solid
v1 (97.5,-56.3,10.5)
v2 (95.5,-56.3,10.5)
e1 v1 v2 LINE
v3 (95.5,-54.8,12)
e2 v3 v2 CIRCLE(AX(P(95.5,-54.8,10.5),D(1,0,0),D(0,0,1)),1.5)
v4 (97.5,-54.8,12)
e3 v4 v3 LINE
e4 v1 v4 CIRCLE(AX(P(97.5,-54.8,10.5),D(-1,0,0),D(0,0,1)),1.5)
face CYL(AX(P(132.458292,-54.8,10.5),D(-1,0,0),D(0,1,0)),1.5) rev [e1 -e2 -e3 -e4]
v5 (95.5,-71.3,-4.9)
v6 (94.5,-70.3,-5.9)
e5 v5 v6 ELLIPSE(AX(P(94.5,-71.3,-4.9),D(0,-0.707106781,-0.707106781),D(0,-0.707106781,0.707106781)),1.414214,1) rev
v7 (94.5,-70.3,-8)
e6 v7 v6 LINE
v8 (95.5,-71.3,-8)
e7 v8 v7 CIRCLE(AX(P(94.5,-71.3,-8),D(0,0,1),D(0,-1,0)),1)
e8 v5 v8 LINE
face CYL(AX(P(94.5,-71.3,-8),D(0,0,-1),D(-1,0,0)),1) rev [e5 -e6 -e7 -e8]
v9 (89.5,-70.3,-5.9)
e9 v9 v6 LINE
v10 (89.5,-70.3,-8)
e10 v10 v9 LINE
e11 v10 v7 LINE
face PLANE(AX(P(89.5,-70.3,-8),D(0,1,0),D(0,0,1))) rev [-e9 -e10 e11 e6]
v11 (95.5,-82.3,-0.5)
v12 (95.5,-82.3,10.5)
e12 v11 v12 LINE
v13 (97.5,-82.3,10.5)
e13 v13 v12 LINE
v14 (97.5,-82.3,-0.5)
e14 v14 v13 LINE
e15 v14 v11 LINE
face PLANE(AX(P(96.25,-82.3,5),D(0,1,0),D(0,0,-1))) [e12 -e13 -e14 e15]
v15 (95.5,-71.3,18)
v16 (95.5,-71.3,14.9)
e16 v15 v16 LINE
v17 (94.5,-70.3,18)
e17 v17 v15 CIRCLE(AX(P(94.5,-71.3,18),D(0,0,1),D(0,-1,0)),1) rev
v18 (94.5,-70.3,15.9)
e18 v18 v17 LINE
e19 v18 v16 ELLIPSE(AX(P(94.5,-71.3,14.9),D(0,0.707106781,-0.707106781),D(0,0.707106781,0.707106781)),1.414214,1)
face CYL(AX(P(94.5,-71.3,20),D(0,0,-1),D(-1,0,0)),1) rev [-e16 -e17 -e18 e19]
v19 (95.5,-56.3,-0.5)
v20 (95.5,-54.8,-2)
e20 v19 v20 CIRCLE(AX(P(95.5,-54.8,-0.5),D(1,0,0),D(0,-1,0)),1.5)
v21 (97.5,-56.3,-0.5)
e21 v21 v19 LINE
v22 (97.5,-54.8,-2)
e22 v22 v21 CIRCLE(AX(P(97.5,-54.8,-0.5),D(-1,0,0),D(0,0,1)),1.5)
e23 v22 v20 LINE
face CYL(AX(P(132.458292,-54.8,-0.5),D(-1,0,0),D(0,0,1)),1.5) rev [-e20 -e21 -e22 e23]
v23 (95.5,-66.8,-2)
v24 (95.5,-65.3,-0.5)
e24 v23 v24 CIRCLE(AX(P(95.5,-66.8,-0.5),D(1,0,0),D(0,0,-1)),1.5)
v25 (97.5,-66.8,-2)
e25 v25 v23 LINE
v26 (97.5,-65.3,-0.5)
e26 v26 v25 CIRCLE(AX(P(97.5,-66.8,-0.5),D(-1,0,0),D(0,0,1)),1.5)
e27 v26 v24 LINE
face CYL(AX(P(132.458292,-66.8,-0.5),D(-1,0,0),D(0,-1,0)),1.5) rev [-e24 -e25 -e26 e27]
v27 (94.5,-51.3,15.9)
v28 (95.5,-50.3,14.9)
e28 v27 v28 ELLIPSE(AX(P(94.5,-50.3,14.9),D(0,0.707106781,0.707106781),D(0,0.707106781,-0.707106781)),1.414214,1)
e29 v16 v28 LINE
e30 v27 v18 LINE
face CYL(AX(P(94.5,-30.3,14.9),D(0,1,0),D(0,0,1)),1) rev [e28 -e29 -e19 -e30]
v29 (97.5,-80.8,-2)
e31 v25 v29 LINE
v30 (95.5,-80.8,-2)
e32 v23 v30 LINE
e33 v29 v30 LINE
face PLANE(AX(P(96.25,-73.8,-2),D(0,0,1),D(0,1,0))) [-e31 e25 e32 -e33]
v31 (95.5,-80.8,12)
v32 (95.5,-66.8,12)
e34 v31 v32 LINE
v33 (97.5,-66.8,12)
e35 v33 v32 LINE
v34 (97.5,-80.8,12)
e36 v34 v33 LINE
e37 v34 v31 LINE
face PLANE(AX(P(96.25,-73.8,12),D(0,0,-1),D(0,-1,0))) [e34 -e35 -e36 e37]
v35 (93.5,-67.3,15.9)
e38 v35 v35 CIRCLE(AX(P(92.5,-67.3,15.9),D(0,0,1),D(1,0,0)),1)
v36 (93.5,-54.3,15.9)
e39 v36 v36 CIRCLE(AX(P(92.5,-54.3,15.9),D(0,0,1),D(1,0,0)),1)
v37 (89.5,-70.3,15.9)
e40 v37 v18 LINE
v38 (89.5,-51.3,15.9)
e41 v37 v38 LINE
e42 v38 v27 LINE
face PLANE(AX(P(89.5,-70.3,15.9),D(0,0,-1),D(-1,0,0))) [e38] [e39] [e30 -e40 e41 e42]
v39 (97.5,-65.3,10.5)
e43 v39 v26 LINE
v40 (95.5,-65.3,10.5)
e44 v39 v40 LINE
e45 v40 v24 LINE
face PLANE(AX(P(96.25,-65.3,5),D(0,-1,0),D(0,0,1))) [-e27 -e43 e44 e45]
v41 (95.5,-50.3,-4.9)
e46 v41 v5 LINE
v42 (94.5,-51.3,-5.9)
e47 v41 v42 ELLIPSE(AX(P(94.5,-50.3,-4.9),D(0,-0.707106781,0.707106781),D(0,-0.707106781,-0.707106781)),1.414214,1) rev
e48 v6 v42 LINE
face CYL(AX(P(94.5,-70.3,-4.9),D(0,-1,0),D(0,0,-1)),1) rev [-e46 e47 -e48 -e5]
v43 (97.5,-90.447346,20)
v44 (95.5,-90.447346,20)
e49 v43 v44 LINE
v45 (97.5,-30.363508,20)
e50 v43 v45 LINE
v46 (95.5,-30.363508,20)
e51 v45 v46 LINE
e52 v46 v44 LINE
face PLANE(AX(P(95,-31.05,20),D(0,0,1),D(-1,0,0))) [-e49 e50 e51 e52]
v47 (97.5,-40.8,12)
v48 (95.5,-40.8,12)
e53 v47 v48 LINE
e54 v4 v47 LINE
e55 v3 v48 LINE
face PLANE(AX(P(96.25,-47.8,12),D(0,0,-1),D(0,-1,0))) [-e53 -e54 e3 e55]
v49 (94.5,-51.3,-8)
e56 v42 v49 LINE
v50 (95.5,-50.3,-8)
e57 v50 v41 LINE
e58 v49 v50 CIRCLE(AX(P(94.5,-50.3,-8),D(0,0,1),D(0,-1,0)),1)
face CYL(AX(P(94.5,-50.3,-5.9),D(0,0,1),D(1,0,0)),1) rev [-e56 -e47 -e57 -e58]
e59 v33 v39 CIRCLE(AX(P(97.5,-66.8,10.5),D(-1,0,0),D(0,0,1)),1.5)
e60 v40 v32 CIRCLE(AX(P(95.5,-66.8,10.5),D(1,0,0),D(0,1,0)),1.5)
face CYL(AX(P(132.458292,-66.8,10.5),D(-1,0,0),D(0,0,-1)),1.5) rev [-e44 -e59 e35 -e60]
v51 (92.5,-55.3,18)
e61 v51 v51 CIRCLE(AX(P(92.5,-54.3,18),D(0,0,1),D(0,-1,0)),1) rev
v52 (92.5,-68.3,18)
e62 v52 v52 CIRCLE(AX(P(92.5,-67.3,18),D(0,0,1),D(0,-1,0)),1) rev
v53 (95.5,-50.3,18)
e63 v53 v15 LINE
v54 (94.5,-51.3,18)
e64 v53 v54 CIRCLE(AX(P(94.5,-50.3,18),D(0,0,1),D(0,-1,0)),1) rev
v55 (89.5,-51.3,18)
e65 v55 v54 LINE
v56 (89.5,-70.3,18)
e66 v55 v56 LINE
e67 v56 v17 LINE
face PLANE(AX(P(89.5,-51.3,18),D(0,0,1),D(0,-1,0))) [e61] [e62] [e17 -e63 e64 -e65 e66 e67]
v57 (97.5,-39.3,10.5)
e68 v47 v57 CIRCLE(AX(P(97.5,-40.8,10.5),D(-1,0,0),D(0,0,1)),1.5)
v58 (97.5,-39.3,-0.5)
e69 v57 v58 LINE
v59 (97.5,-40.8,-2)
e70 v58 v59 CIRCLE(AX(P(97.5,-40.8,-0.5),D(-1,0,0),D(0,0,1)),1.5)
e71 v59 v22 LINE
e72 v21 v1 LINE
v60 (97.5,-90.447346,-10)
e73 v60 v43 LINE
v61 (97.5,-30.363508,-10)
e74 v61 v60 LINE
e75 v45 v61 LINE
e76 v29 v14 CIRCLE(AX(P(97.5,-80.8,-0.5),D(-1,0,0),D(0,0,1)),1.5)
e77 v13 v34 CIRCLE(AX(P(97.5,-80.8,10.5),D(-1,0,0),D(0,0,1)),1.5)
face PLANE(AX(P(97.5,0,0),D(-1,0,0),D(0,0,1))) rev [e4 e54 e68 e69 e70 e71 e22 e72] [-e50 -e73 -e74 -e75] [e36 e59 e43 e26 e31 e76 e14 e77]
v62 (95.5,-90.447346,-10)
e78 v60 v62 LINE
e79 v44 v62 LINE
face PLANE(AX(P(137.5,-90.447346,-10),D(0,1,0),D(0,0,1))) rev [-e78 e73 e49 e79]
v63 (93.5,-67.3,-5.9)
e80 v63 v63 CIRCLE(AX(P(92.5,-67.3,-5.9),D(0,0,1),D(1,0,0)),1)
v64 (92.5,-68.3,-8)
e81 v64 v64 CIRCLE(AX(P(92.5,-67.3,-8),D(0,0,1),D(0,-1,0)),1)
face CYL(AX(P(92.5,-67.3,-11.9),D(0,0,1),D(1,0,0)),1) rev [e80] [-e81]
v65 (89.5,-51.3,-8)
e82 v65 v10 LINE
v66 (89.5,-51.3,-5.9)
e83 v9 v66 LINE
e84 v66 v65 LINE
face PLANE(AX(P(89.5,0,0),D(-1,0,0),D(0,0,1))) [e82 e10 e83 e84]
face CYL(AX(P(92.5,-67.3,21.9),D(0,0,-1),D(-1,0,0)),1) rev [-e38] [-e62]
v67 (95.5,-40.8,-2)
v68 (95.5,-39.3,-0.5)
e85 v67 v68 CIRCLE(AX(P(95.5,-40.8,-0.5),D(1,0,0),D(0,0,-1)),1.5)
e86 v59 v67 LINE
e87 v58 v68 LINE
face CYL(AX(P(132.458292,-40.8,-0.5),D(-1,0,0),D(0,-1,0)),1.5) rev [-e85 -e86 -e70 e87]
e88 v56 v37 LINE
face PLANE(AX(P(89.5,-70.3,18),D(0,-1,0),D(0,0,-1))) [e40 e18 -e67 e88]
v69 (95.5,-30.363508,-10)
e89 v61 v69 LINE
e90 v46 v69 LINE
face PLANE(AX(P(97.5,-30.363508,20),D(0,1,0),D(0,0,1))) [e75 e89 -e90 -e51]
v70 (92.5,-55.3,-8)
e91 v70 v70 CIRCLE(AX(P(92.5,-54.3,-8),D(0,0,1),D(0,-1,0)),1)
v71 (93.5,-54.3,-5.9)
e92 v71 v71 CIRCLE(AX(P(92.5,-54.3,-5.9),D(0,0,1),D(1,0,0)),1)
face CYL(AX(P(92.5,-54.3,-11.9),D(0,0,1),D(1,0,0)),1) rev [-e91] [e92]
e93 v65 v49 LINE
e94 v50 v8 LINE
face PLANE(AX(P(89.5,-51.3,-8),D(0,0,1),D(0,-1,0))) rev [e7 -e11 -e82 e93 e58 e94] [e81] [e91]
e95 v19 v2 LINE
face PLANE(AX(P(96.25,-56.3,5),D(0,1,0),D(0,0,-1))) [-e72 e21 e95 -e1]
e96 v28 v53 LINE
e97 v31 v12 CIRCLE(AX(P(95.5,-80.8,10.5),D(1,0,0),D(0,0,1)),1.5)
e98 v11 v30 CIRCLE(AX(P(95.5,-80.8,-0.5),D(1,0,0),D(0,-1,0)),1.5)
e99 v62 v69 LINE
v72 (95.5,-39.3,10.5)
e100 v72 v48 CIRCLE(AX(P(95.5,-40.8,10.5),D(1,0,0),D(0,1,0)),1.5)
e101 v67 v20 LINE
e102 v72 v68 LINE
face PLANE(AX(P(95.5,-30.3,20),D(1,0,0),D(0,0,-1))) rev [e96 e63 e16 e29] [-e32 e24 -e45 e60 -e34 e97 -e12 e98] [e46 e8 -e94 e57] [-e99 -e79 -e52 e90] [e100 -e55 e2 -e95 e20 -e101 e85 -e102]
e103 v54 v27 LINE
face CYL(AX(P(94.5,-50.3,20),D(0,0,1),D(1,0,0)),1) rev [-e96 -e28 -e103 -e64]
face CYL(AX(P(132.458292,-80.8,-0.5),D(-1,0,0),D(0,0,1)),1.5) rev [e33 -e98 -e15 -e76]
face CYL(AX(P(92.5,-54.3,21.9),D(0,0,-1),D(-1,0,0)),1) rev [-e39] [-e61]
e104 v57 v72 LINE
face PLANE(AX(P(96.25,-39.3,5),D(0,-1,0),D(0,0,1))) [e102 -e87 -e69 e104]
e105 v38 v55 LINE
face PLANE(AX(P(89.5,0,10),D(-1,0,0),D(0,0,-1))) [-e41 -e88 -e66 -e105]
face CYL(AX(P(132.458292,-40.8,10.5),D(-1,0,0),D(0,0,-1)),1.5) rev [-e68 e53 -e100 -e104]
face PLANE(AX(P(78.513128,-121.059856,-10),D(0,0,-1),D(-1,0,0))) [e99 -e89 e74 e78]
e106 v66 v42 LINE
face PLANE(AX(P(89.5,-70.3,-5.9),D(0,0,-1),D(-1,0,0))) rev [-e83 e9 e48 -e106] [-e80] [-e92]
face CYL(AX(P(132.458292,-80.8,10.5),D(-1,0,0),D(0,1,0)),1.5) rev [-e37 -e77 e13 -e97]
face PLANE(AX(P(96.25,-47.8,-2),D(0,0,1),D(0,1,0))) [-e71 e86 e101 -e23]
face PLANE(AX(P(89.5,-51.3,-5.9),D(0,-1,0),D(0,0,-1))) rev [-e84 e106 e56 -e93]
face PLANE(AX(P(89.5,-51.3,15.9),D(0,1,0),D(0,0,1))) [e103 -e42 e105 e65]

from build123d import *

# Parameters (mm, degrees)
CUT_EXTRUDE8_START       = -10
CUT_EXTRUDE8_OUTLINE_W   = 1.5
CUT_EXTRUDE8_OUTLINE_H   = 9
CUT_EXTRUDE8_DEPTH       = 30
CUT_EXTRUDE8_2_OUTLINE_W = 1.5
CUT_EXTRUDE8_2_OUTLINE_H = 17
CUT_EXTRUDE8_2_DEPTH     = 9.5
CUT_EXTRUDE8_START_2     = 10.5
CUT_EXTRUDE8_3_OUTLINE_W = 1.5
CUT_EXTRUDE8_3_OUTLINE_H = 17
CUT_EXTRUDE8_3_DEPTH     = 9.5
CUT_EXTRUDE9_START       = -2
CUT_EXTRUDE9_DEPTH       = 3
SKETCH8_W                = 44.763309207
SKETCH8_H                = 3.029199698
CUT_EXTRUDE10_DEPTH      = 21
SKETCH9_W                = 30
SKETCH9_H                = 60.083837712
BOSS_EXTRUDE3_DEPTH      = 2
SKETCH13_W               = 2.1
SKETCH13_H               = 19
BOSS_EXTRUDE5_DEPTH      = 6
SKETCH14_R               = 1
CUT_EXTRUDE12_DEPTH      = 6
FILLET1_R                = 1
FILLET1_OF_MIRROR1_R     = 1


with BuildPart() as part:
    # Cut-Extrude8: read off the stored shape, not the designer's step
    # Cut-Extrude8 outline → Cut-Extrude8 (new body)
    with BuildSketch(Plane.XY.offset(CUT_EXTRUDE8_START)):
        with BuildLine():
            Line((97, -39.3), (97, -32.3))
            ThreePointArc((97, -32.3), (96.58113883, -31.075255129), (95.5, -30.363508327))
            Line((95.5, -30.363508327), (95.5, -39.3))
            Line((95.5, -39.3), (97, -39.3))
        make_face()
        with Locations((96.25, -60.8)):
            Rectangle(CUT_EXTRUDE8_OUTLINE_W, CUT_EXTRUDE8_OUTLINE_H)
        with BuildLine():
            Line((97, -90.447346039), (97, -82.3))
            Line((97, -82.3), (95.5, -82.3))
            Line((95.5, -82.3), (95.5, -94.921216129))
            Line((95.5, -94.921216129), (96.879385242, -91.131386325))
            ThreePointArc((96.879385242, -91.131386325), (96.969615506, -90.794642394), (97, -90.447346039))
        make_face()
    extrude(amount=CUT_EXTRUDE8_DEPTH)

    # Cut-Extrude8 2 outline → Cut-Extrude8 2 (add)
    with BuildSketch(Plane.XY.offset(CUT_EXTRUDE8_START)):
        with Locations((96.25, -47.8)):
            Rectangle(CUT_EXTRUDE8_2_OUTLINE_W, CUT_EXTRUDE8_2_OUTLINE_H)
        with Locations((96.25, -73.8)):
            Rectangle(CUT_EXTRUDE8_2_OUTLINE_W, CUT_EXTRUDE8_2_OUTLINE_H)
    extrude(amount=CUT_EXTRUDE8_2_DEPTH)

    # Cut-Extrude8 3 outline → Cut-Extrude8 3 (add)
    with BuildSketch(Plane.XY.offset(CUT_EXTRUDE8_START_2)):
        with Locations((96.25, -47.8)):
            Rectangle(CUT_EXTRUDE8_3_OUTLINE_W, CUT_EXTRUDE8_3_OUTLINE_H)
        with Locations((96.25, -73.8)):
            Rectangle(CUT_EXTRUDE8_3_OUTLINE_W, CUT_EXTRUDE8_3_OUTLINE_H)
    extrude(amount=CUT_EXTRUDE8_3_DEPTH)

    # Cut-Extrude8 4: loft between two sections, ruled curve by curve
    cut_extrude8_4_from = [
        Edge.make_three_point_arc((94.954911098, -94.722819994, 16.513911403), (95.320152625, -93.719327147, 16.565596562), (95.497858615, -93.231083953, 17.5)),
        Edge.make_three_point_arc((95.497858615, -93.231083953, 17.5), (95.320152625, -93.719327147, 18.434403438), (94.954911098, -94.722819994, 18.486088597)),
        Edge.make_line((94.954911098, -94.722819994, 18.486088597), (94.954911098, -94.722819994, 16.513911403)),
    ]
    cut_extrude8_4_to = [
        Edge.make_three_point_arc((95.5, -94.921216129, 16.513911403), (95.865241526, -93.917723283, 16.565596562), (96.042947516, -93.429480088, 17.5)),
        Edge.make_three_point_arc((96.042947516, -93.429480088, 17.5), (95.865241526, -93.917723283, 18.434403438), (95.5, -94.921216129, 18.486088597)),
        Edge.make_line((95.5, -94.921216129, 18.486088597), (95.5, -94.921216129, 16.513911403)),
    ]
    cut_extrude8_4 = Solid(Shell([*[Face.make_surface_from_curves(cut_extrude8_4_from[k], cut_extrude8_4_to[k]) for k in range(3)], Face(Wire(cut_extrude8_4_from)), Face(Wire(cut_extrude8_4_to))]))
    add(cut_extrude8_4, mode=Mode.SUBTRACT)

    # Cut-Extrude8 5: loft between two sections, ruled curve by curve
    cut_extrude8_5_from = [
        Edge.make_three_point_arc((94.954911098, -94.722819994, -8.486088597), (95.320152625, -93.719327147, -8.434403438), (95.497858615, -93.231083953, -7.5)),
        Edge.make_three_point_arc((95.497858615, -93.231083953, -7.5), (95.320152625, -93.719327147, -6.565596562), (94.954911098, -94.722819994, -6.513911403)),
        Edge.make_line((94.954911098, -94.722819994, -6.513911403), (94.954911098, -94.722819994, -8.486088597)),
    ]
    cut_extrude8_5_to = [
        Edge.make_three_point_arc((95.5, -94.921216129, -8.486088597), (95.865241526, -93.917723283, -8.434403438), (96.042947516, -93.429480088, -7.5)),
        Edge.make_three_point_arc((96.042947516, -93.429480088, -7.5), (95.865241526, -93.917723283, -6.565596562), (95.5, -94.921216129, -6.513911403)),
        Edge.make_line((95.5, -94.921216129, -6.513911403), (95.5, -94.921216129, -8.486088597)),
    ]
    cut_extrude8_5 = Solid(Shell([*[Face.make_surface_from_curves(cut_extrude8_5_from[k], cut_extrude8_5_to[k]) for k in range(3)], Face(Wire(cut_extrude8_5_from)), Face(Wire(cut_extrude8_5_to))]))
    add(cut_extrude8_5, mode=Mode.SUBTRACT)

    # Cut-Extrude8 6: loft between two sections, ruled curve by curve
    cut_extrude8_6_from = [
        Edge.make_three_point_arc((97, -54.8, -2), (97, -55.860660172, -1.560660172), (97, -56.3, -0.5)),
        Edge.make_three_point_arc((97, -39.3, -0.5), (97, -39.739339828, -1.560660172), (97, -40.8, -2)),
        Edge.make_line((97, -40.8, -2), (97, -54.8, -2)),
        Edge.make_line((97, -39.3, -0.5), (97, -56.3, -0.5)),
    ]
    cut_extrude8_6_to = [
        Edge.make_three_point_arc((95.5, -54.8, -2), (95.5, -55.860660172, -1.560660172), (95.5, -56.3, -0.5)),
        Edge.make_three_point_arc((95.5, -39.3, -0.5), (95.5, -39.739339828, -1.560660172), (95.5, -40.8, -2)),
        Edge.make_line((95.5, -40.8, -2), (95.5, -54.8, -2)),
        Edge.make_line((95.5, -39.3, -0.5), (95.5, -56.3, -0.5)),
    ]
    cut_extrude8_6 = Solid(Shell([*[Face.make_surface_from_curves(cut_extrude8_6_from[k], cut_extrude8_6_to[k]) for k in range(4)], Face(Wire(cut_extrude8_6_from)), Face(Wire(cut_extrude8_6_to))]))
    add(cut_extrude8_6, mode=Mode.SUBTRACT)

    # Cut-Extrude8 7: loft between two sections, ruled curve by curve
    cut_extrude8_7_from = [
        Edge.make_three_point_arc((97, -65.3, -0.5), (97, -65.739339828, -1.560660172), (97, -66.8, -2)),
        Edge.make_three_point_arc((97, -80.8, -2), (97, -81.860660172, -1.560660172), (97, -82.3, -0.5)),
        Edge.make_line((97, -66.8, -2), (97, -80.8, -2)),
        Edge.make_line((97, -82.3, -0.5), (97, -65.3, -0.5)),
    ]
    cut_extrude8_7_to = [
        Edge.make_three_point_arc((95.5, -65.3, -0.5), (95.5, -65.739339828, -1.560660172), (95.5, -66.8, -2)),
        Edge.make_three_point_arc((95.5, -80.8, -2), (95.5, -81.860660172, -1.560660172), (95.5, -82.3, -0.5)),
        Edge.make_line((95.5, -66.8, -2), (95.5, -80.8, -2)),
        Edge.make_line((95.5, -82.3, -0.5), (95.5, -65.3, -0.5)),
    ]
    cut_extrude8_7 = Solid(Shell([*[Face.make_surface_from_curves(cut_extrude8_7_from[k], cut_extrude8_7_to[k]) for k in range(4)], Face(Wire(cut_extrude8_7_from)), Face(Wire(cut_extrude8_7_to))]))
    add(cut_extrude8_7, mode=Mode.SUBTRACT)

    # Cut-Extrude8 8: loft between two sections, ruled curve by curve
    cut_extrude8_8_from = [
        Edge.make_three_point_arc((97, -56.3, 10.5), (97, -55.860660172, 11.560660172), (97, -54.8, 12)),
        Edge.make_three_point_arc((97, -40.8, 12), (97, -39.739339828, 11.560660172), (97, -39.3, 10.5)),
        Edge.make_line((97, -40.8, 12), (97, -54.8, 12)),
        Edge.make_line((97, -39.3, 10.5), (97, -56.3, 10.5)),
    ]
    cut_extrude8_8_to = [
        Edge.make_three_point_arc((95.5, -56.3, 10.5), (95.5, -55.860660172, 11.560660172), (95.5, -54.8, 12)),
        Edge.make_three_point_arc((95.5, -40.8, 12), (95.5, -39.739339828, 11.560660172), (95.5, -39.3, 10.5)),
        Edge.make_line((95.5, -40.8, 12), (95.5, -54.8, 12)),
        Edge.make_line((95.5, -39.3, 10.5), (95.5, -56.3, 10.5)),
    ]
    cut_extrude8_8 = Solid(Shell([*[Face.make_surface_from_curves(cut_extrude8_8_from[k], cut_extrude8_8_to[k]) for k in range(4)], Face(Wire(cut_extrude8_8_from)), Face(Wire(cut_extrude8_8_to))]))
    add(cut_extrude8_8, mode=Mode.SUBTRACT)

    # Cut-Extrude8 9: loft between two sections, ruled curve by curve
    cut_extrude8_9_from = [
        Edge.make_three_point_arc((97, -82.3, 10.5), (97, -81.860660172, 11.560660172), (97, -80.8, 12)),
        Edge.make_three_point_arc((97, -66.8, 12), (97, -65.739339828, 11.560660172), (97, -65.3, 10.5)),
        Edge.make_line((97, -66.8, 12), (97, -80.8, 12)),
        Edge.make_line((97, -65.3, 10.5), (97, -82.3, 10.5)),
    ]
    cut_extrude8_9_to = [
        Edge.make_three_point_arc((95.5, -82.3, 10.5), (95.5, -81.860660172, 11.560660172), (95.5, -80.8, 12)),
        Edge.make_three_point_arc((95.5, -66.8, 12), (95.5, -65.739339828, 11.560660172), (95.5, -65.3, 10.5)),
        Edge.make_line((95.5, -66.8, 12), (95.5, -80.8, 12)),
        Edge.make_line((95.5, -65.3, 10.5), (95.5, -82.3, 10.5)),
    ]
    cut_extrude8_9 = Solid(Shell([*[Face.make_surface_from_curves(cut_extrude8_9_from[k], cut_extrude8_9_to[k]) for k in range(4)], Face(Wire(cut_extrude8_9_from)), Face(Wire(cut_extrude8_9_to))]))
    add(cut_extrude8_9, mode=Mode.SUBTRACT)

    # Cut-Extrude8 10: loft between two sections, ruled curve by curve
    cut_extrude8_10_from = [
        Edge.make_three_point_arc((95.5, -75.3, 16.4), (95.5, -74.2, 17.5), (95.5, -75.3, 18.6)),
        Edge.make_three_point_arc((95.5, -75.3, 18.6), (95.5, -76.4, 17.5), (95.5, -75.3, 16.4)),
    ]
    cut_extrude8_10_to = [
        Edge.make_three_point_arc((97, -75.3, 16.4), (97, -74.2, 17.5), (97, -75.3, 18.6)),
        Edge.make_three_point_arc((97, -75.3, 18.6), (97, -76.4, 17.5), (97, -75.3, 16.4)),
    ]
    cut_extrude8_10 = Solid(Shell([*[Face.make_surface_from_curves(cut_extrude8_10_from[k], cut_extrude8_10_to[k]) for k in range(2)], Face(Wire(cut_extrude8_10_from)), Face(Wire(cut_extrude8_10_to))]))
    add(cut_extrude8_10, mode=Mode.SUBTRACT)

    # Cut-Extrude8 11: loft between two sections, ruled curve by curve
    cut_extrude8_11_from = [
        Edge.make_three_point_arc((95.5, -46.3, 16.4), (95.5, -45.2, 17.5), (95.5, -46.3, 18.6)),
        Edge.make_three_point_arc((95.5, -46.3, 18.6), (95.5, -47.4, 17.5), (95.5, -46.3, 16.4)),
    ]
    cut_extrude8_11_to = [
        Edge.make_three_point_arc((97, -46.3, 16.4), (97, -45.2, 17.5), (97, -46.3, 18.6)),
        Edge.make_three_point_arc((97, -46.3, 18.6), (97, -47.4, 17.5), (97, -46.3, 16.4)),
    ]
    cut_extrude8_11 = Solid(Shell([*[Face.make_surface_from_curves(cut_extrude8_11_from[k], cut_extrude8_11_to[k]) for k in range(2)], Face(Wire(cut_extrude8_11_from)), Face(Wire(cut_extrude8_11_to))]))
    add(cut_extrude8_11, mode=Mode.SUBTRACT)

    # Cut-Extrude8 12: loft between two sections, ruled curve by curve
    cut_extrude8_12_from = [
        Edge.make_three_point_arc((95.5, -75.3, -8.6), (95.5, -74.2, -7.5), (95.5, -75.3, -6.4)),
        Edge.make_three_point_arc((95.5, -75.3, -6.4), (95.5, -76.4, -7.5), (95.5, -75.3, -8.6)),
    ]
    cut_extrude8_12_to = [
        Edge.make_three_point_arc((97, -75.3, -8.6), (97, -74.2, -7.5), (97, -75.3, -6.4)),
        Edge.make_three_point_arc((97, -75.3, -6.4), (97, -76.4, -7.5), (97, -75.3, -8.6)),
    ]
    cut_extrude8_12 = Solid(Shell([*[Face.make_surface_from_curves(cut_extrude8_12_from[k], cut_extrude8_12_to[k]) for k in range(2)], Face(Wire(cut_extrude8_12_from)), Face(Wire(cut_extrude8_12_to))]))
    add(cut_extrude8_12, mode=Mode.SUBTRACT)

    # Cut-Extrude8 13: loft between two sections, ruled curve by curve
    cut_extrude8_13_from = [
        Edge.make_three_point_arc((95.5, -46.3, -8.6), (95.5, -45.2, -7.5), (95.5, -46.3, -6.4)),
        Edge.make_three_point_arc((95.5, -46.3, -6.4), (95.5, -47.4, -7.5), (95.5, -46.3, -8.6)),
    ]
    cut_extrude8_13_to = [
        Edge.make_three_point_arc((97, -46.3, -8.6), (97, -45.2, -7.5), (97, -46.3, -6.4)),
        Edge.make_three_point_arc((97, -46.3, -6.4), (97, -47.4, -7.5), (97, -46.3, -8.6)),
    ]
    cut_extrude8_13 = Solid(Shell([*[Face.make_surface_from_curves(cut_extrude8_13_from[k], cut_extrude8_13_to[k]) for k in range(2)], Face(Wire(cut_extrude8_13_from)), Face(Wire(cut_extrude8_13_to))]))
    add(cut_extrude8_13, mode=Mode.SUBTRACT)

    # Cut-Extrude9: read off the stored shape, not the designer's step
    # Cut-Extrude9 outline → Cut-Extrude9 (cut)
    with BuildSketch(Plane.ZY.offset(-95.5).offset(CUT_EXTRUDE9_START)):
        with BuildLine():
            Line((-10, -94.921216129), (-8.486088597, -94.921216129))
            add(Edge.make_bspline(
                [(-8.486088597, -94.921216129), (-8.528622211, -94.840365377), (-8.56433173, -94.750294794), (-8.590341572, -94.651077369), (-8.602806532, -94.544671361), (-8.590253721, -94.116362583), (-8.444290191, -93.745116805), (-8.117111171, -93.513621081), (-7.777782646, -93.429480088), (-7.222217354, -93.429480088), (-6.882888829, -93.513621081), (-6.555709809, -93.745116805), (-6.409746279, -94.116362583), (-6.397193468, -94.544671361), (-6.409658428, -94.651077369), (-6.43566827, -94.750294794), (-6.471377789, -94.840365377), (-6.513911403, -94.921216129)],
                knots=[6.221037859, 6.221037859, 6.221037859, 6.221037859, 6.221037859, 6.221037859, 6.742302252, 6.742302252, 6.742302252, 6.742302252, 8.250951131, 8.250951131, 8.250951131, 8.250951131, 9.75960001, 9.75960001, 9.75960001, 9.75960001, 10.280864403, 10.280864403, 10.280864403, 10.280864403, 10.280864403, 10.280864403], degree=5, weights=[1, 1, 1.000250109, 1.000114964, 1, 1, 0.966437741, 0.979277403, 1, 1, 0.979277403, 0.966437741, 1, 1, 1.000114964, 1.000250109, 1, 1]))
            Line((-6.513911403, -94.921216129), (16.513911403, -94.921216129))
            add(Edge.make_bspline(
                [(16.513911403, -94.921216129), (16.471377789, -94.840365377), (16.43566827, -94.750294794), (16.409658428, -94.651077369), (16.397193468, -94.544671361), (16.409746279, -94.116362583), (16.555709809, -93.745116805), (16.882888829, -93.513621081), (17.222217354, -93.429480088), (17.777782646, -93.429480088), (18.117111171, -93.513621081), (18.444290191, -93.745116805), (18.590253721, -94.116362583), (18.602806532, -94.544671361), (18.590341572, -94.651077369), (18.56433173, -94.750294794), (18.528622211, -94.840365377), (18.486088597, -94.921216129)],
                knots=[6.221037859, 6.221037859, 6.221037859, 6.221037859, 6.221037859, 6.221037859, 6.742302252, 6.742302252, 6.742302252, 6.742302252, 8.250951131, 8.250951131, 8.250951131, 8.250951131, 9.75960001, 9.75960001, 9.75960001, 9.75960001, 10.280864403, 10.280864403, 10.280864403, 10.280864403, 10.280864403, 10.280864403], degree=5, weights=[1, 1, 1.000250109, 1.000114964, 1, 1, 0.966437741, 0.979277403, 1, 1, 0.979277403, 0.966437741, 1, 1, 1.000114964, 1.000250109, 1, 1]))
            Line((18.486088597, -94.921216129), (20, -94.921216129))
            Line((20, -94.921216129), (20, -90.447346039))
            Line((20, -90.447346039), (-10, -90.447346039))
            Line((-10, -90.447346039), (-10, -94.921216129))
        make_face()
    extrude(amount=CUT_EXTRUDE9_DEPTH, mode=Mode.SUBTRACT)

    # Sketch8 → Cut-Extrude10 (cut, symmetric)
    with BuildSketch(Plane.ZY.offset(-95.5)):
        with Locations((1.902623412, -94.949992123)):
            Rectangle(SKETCH8_W, SKETCH8_H)
    extrude(amount=CUT_EXTRUDE10_DEPTH, both=True, mode=Mode.SUBTRACT)

    # Sketch9 → Boss-Extrude3 (add)
    with BuildSketch(Plane.ZY.offset(-95.5)):
        with Locations((5, -60.405427183)):
            Rectangle(SKETCH9_W, SKETCH9_H)
        with BuildLine():
            Line((-0.5, -82.3), (10.5, -82.3))
            ThreePointArc((10.5, -82.3), (11.560660172, -81.860660172), (12, -80.8))
            Line((12, -80.8), (12, -66.8))
            ThreePointArc((12, -66.8), (11.560660172, -65.739339828), (10.5, -65.3))
            Line((10.5, -65.3), (-0.5, -65.3))
            ThreePointArc((-0.5, -65.3), (-1.560660172, -65.739339828), (-2, -66.8))
            Line((-2, -66.8), (-2, -80.8))
            ThreePointArc((-2, -80.8), (-1.560660172, -81.860660172), (-0.5, -82.3))
        make_face(mode=Mode.SUBTRACT)
        with BuildLine():
            Line((12, -54.8), (12, -40.8))
            ThreePointArc((12, -40.8), (11.560660172, -39.739339828), (10.5, -39.3))
            Line((10.5, -39.3), (-0.5, -39.3))
            ThreePointArc((-0.5, -39.3), (-1.560660172, -39.739339828), (-2, -40.8))
            Line((-2, -40.8), (-2, -54.8))
            ThreePointArc((-2, -54.8), (-1.560660172, -55.860660172), (-0.5, -56.3))
            Line((-0.5, -56.3), (10.5, -56.3))
            ThreePointArc((10.5, -56.3), (11.560660172, -55.860660172), (12, -54.8))
        make_face(mode=Mode.SUBTRACT)
    extrude(amount=-BOSS_EXTRUDE3_DEPTH)

    # Sketch13 → Boss-Extrude5 (add)
    with BuildSketch(Plane.ZY.offset(-95.5)):
        with Locations((-6.95, -60.8)):
            Rectangle(SKETCH13_W, SKETCH13_H)
    boss_extrude5 = extrude(amount=BOSS_EXTRUDE5_DEPTH)

    # Sketch14 → Cut-Extrude12 (cut)
    with BuildSketch(Plane.XY.offset(-5.9)):
        with Locations((92.5, -54.3)):
            Circle(SKETCH14_R)
        with Locations((92.5, -67.3)):
            Circle(SKETCH14_R)
    cut_extrude12 = extrude(amount=-CUT_EXTRUDE12_DEPTH, mode=Mode.SUBTRACT)

    # Fillet1
    fillet1_edges = [part.edges().sort_by_distance(p)[0] for p in [
        (95.5, -51.3, -6.95),
        (95.5, -70.3, -6.95),
        (95.5, -60.8, -5.9),
    ]]
    fillet(fillet1_edges, radius=FILLET1_R)

    # Mirror1: Boss-Extrude5, Cut-Extrude12 across plane
    add(boss_extrude5.mirror(Plane(origin=(0, 0, 5), x_dir=(1, 0, 0), z_dir=(0, 0, -1))))
    add(cut_extrude12.mirror(Plane(origin=(0, 0, 5), x_dir=(1, 0, 0), z_dir=(0, 0, -1))), mode=Mode.SUBTRACT)

    # Fillet1 of Mirror1
    fillet1_of_mirror1_edges = [part.edges().sort_by_distance(p)[0] for p in [
        (95.5, -51.3, 16.95),
        (95.5, -70.3, 16.95),
        (95.5, -60.8, 15.9),
    ]]
    fillet(fillet1_of_mirror1_edges, radius=FILLET1_OF_MIRROR1_R)


solid = part.part
